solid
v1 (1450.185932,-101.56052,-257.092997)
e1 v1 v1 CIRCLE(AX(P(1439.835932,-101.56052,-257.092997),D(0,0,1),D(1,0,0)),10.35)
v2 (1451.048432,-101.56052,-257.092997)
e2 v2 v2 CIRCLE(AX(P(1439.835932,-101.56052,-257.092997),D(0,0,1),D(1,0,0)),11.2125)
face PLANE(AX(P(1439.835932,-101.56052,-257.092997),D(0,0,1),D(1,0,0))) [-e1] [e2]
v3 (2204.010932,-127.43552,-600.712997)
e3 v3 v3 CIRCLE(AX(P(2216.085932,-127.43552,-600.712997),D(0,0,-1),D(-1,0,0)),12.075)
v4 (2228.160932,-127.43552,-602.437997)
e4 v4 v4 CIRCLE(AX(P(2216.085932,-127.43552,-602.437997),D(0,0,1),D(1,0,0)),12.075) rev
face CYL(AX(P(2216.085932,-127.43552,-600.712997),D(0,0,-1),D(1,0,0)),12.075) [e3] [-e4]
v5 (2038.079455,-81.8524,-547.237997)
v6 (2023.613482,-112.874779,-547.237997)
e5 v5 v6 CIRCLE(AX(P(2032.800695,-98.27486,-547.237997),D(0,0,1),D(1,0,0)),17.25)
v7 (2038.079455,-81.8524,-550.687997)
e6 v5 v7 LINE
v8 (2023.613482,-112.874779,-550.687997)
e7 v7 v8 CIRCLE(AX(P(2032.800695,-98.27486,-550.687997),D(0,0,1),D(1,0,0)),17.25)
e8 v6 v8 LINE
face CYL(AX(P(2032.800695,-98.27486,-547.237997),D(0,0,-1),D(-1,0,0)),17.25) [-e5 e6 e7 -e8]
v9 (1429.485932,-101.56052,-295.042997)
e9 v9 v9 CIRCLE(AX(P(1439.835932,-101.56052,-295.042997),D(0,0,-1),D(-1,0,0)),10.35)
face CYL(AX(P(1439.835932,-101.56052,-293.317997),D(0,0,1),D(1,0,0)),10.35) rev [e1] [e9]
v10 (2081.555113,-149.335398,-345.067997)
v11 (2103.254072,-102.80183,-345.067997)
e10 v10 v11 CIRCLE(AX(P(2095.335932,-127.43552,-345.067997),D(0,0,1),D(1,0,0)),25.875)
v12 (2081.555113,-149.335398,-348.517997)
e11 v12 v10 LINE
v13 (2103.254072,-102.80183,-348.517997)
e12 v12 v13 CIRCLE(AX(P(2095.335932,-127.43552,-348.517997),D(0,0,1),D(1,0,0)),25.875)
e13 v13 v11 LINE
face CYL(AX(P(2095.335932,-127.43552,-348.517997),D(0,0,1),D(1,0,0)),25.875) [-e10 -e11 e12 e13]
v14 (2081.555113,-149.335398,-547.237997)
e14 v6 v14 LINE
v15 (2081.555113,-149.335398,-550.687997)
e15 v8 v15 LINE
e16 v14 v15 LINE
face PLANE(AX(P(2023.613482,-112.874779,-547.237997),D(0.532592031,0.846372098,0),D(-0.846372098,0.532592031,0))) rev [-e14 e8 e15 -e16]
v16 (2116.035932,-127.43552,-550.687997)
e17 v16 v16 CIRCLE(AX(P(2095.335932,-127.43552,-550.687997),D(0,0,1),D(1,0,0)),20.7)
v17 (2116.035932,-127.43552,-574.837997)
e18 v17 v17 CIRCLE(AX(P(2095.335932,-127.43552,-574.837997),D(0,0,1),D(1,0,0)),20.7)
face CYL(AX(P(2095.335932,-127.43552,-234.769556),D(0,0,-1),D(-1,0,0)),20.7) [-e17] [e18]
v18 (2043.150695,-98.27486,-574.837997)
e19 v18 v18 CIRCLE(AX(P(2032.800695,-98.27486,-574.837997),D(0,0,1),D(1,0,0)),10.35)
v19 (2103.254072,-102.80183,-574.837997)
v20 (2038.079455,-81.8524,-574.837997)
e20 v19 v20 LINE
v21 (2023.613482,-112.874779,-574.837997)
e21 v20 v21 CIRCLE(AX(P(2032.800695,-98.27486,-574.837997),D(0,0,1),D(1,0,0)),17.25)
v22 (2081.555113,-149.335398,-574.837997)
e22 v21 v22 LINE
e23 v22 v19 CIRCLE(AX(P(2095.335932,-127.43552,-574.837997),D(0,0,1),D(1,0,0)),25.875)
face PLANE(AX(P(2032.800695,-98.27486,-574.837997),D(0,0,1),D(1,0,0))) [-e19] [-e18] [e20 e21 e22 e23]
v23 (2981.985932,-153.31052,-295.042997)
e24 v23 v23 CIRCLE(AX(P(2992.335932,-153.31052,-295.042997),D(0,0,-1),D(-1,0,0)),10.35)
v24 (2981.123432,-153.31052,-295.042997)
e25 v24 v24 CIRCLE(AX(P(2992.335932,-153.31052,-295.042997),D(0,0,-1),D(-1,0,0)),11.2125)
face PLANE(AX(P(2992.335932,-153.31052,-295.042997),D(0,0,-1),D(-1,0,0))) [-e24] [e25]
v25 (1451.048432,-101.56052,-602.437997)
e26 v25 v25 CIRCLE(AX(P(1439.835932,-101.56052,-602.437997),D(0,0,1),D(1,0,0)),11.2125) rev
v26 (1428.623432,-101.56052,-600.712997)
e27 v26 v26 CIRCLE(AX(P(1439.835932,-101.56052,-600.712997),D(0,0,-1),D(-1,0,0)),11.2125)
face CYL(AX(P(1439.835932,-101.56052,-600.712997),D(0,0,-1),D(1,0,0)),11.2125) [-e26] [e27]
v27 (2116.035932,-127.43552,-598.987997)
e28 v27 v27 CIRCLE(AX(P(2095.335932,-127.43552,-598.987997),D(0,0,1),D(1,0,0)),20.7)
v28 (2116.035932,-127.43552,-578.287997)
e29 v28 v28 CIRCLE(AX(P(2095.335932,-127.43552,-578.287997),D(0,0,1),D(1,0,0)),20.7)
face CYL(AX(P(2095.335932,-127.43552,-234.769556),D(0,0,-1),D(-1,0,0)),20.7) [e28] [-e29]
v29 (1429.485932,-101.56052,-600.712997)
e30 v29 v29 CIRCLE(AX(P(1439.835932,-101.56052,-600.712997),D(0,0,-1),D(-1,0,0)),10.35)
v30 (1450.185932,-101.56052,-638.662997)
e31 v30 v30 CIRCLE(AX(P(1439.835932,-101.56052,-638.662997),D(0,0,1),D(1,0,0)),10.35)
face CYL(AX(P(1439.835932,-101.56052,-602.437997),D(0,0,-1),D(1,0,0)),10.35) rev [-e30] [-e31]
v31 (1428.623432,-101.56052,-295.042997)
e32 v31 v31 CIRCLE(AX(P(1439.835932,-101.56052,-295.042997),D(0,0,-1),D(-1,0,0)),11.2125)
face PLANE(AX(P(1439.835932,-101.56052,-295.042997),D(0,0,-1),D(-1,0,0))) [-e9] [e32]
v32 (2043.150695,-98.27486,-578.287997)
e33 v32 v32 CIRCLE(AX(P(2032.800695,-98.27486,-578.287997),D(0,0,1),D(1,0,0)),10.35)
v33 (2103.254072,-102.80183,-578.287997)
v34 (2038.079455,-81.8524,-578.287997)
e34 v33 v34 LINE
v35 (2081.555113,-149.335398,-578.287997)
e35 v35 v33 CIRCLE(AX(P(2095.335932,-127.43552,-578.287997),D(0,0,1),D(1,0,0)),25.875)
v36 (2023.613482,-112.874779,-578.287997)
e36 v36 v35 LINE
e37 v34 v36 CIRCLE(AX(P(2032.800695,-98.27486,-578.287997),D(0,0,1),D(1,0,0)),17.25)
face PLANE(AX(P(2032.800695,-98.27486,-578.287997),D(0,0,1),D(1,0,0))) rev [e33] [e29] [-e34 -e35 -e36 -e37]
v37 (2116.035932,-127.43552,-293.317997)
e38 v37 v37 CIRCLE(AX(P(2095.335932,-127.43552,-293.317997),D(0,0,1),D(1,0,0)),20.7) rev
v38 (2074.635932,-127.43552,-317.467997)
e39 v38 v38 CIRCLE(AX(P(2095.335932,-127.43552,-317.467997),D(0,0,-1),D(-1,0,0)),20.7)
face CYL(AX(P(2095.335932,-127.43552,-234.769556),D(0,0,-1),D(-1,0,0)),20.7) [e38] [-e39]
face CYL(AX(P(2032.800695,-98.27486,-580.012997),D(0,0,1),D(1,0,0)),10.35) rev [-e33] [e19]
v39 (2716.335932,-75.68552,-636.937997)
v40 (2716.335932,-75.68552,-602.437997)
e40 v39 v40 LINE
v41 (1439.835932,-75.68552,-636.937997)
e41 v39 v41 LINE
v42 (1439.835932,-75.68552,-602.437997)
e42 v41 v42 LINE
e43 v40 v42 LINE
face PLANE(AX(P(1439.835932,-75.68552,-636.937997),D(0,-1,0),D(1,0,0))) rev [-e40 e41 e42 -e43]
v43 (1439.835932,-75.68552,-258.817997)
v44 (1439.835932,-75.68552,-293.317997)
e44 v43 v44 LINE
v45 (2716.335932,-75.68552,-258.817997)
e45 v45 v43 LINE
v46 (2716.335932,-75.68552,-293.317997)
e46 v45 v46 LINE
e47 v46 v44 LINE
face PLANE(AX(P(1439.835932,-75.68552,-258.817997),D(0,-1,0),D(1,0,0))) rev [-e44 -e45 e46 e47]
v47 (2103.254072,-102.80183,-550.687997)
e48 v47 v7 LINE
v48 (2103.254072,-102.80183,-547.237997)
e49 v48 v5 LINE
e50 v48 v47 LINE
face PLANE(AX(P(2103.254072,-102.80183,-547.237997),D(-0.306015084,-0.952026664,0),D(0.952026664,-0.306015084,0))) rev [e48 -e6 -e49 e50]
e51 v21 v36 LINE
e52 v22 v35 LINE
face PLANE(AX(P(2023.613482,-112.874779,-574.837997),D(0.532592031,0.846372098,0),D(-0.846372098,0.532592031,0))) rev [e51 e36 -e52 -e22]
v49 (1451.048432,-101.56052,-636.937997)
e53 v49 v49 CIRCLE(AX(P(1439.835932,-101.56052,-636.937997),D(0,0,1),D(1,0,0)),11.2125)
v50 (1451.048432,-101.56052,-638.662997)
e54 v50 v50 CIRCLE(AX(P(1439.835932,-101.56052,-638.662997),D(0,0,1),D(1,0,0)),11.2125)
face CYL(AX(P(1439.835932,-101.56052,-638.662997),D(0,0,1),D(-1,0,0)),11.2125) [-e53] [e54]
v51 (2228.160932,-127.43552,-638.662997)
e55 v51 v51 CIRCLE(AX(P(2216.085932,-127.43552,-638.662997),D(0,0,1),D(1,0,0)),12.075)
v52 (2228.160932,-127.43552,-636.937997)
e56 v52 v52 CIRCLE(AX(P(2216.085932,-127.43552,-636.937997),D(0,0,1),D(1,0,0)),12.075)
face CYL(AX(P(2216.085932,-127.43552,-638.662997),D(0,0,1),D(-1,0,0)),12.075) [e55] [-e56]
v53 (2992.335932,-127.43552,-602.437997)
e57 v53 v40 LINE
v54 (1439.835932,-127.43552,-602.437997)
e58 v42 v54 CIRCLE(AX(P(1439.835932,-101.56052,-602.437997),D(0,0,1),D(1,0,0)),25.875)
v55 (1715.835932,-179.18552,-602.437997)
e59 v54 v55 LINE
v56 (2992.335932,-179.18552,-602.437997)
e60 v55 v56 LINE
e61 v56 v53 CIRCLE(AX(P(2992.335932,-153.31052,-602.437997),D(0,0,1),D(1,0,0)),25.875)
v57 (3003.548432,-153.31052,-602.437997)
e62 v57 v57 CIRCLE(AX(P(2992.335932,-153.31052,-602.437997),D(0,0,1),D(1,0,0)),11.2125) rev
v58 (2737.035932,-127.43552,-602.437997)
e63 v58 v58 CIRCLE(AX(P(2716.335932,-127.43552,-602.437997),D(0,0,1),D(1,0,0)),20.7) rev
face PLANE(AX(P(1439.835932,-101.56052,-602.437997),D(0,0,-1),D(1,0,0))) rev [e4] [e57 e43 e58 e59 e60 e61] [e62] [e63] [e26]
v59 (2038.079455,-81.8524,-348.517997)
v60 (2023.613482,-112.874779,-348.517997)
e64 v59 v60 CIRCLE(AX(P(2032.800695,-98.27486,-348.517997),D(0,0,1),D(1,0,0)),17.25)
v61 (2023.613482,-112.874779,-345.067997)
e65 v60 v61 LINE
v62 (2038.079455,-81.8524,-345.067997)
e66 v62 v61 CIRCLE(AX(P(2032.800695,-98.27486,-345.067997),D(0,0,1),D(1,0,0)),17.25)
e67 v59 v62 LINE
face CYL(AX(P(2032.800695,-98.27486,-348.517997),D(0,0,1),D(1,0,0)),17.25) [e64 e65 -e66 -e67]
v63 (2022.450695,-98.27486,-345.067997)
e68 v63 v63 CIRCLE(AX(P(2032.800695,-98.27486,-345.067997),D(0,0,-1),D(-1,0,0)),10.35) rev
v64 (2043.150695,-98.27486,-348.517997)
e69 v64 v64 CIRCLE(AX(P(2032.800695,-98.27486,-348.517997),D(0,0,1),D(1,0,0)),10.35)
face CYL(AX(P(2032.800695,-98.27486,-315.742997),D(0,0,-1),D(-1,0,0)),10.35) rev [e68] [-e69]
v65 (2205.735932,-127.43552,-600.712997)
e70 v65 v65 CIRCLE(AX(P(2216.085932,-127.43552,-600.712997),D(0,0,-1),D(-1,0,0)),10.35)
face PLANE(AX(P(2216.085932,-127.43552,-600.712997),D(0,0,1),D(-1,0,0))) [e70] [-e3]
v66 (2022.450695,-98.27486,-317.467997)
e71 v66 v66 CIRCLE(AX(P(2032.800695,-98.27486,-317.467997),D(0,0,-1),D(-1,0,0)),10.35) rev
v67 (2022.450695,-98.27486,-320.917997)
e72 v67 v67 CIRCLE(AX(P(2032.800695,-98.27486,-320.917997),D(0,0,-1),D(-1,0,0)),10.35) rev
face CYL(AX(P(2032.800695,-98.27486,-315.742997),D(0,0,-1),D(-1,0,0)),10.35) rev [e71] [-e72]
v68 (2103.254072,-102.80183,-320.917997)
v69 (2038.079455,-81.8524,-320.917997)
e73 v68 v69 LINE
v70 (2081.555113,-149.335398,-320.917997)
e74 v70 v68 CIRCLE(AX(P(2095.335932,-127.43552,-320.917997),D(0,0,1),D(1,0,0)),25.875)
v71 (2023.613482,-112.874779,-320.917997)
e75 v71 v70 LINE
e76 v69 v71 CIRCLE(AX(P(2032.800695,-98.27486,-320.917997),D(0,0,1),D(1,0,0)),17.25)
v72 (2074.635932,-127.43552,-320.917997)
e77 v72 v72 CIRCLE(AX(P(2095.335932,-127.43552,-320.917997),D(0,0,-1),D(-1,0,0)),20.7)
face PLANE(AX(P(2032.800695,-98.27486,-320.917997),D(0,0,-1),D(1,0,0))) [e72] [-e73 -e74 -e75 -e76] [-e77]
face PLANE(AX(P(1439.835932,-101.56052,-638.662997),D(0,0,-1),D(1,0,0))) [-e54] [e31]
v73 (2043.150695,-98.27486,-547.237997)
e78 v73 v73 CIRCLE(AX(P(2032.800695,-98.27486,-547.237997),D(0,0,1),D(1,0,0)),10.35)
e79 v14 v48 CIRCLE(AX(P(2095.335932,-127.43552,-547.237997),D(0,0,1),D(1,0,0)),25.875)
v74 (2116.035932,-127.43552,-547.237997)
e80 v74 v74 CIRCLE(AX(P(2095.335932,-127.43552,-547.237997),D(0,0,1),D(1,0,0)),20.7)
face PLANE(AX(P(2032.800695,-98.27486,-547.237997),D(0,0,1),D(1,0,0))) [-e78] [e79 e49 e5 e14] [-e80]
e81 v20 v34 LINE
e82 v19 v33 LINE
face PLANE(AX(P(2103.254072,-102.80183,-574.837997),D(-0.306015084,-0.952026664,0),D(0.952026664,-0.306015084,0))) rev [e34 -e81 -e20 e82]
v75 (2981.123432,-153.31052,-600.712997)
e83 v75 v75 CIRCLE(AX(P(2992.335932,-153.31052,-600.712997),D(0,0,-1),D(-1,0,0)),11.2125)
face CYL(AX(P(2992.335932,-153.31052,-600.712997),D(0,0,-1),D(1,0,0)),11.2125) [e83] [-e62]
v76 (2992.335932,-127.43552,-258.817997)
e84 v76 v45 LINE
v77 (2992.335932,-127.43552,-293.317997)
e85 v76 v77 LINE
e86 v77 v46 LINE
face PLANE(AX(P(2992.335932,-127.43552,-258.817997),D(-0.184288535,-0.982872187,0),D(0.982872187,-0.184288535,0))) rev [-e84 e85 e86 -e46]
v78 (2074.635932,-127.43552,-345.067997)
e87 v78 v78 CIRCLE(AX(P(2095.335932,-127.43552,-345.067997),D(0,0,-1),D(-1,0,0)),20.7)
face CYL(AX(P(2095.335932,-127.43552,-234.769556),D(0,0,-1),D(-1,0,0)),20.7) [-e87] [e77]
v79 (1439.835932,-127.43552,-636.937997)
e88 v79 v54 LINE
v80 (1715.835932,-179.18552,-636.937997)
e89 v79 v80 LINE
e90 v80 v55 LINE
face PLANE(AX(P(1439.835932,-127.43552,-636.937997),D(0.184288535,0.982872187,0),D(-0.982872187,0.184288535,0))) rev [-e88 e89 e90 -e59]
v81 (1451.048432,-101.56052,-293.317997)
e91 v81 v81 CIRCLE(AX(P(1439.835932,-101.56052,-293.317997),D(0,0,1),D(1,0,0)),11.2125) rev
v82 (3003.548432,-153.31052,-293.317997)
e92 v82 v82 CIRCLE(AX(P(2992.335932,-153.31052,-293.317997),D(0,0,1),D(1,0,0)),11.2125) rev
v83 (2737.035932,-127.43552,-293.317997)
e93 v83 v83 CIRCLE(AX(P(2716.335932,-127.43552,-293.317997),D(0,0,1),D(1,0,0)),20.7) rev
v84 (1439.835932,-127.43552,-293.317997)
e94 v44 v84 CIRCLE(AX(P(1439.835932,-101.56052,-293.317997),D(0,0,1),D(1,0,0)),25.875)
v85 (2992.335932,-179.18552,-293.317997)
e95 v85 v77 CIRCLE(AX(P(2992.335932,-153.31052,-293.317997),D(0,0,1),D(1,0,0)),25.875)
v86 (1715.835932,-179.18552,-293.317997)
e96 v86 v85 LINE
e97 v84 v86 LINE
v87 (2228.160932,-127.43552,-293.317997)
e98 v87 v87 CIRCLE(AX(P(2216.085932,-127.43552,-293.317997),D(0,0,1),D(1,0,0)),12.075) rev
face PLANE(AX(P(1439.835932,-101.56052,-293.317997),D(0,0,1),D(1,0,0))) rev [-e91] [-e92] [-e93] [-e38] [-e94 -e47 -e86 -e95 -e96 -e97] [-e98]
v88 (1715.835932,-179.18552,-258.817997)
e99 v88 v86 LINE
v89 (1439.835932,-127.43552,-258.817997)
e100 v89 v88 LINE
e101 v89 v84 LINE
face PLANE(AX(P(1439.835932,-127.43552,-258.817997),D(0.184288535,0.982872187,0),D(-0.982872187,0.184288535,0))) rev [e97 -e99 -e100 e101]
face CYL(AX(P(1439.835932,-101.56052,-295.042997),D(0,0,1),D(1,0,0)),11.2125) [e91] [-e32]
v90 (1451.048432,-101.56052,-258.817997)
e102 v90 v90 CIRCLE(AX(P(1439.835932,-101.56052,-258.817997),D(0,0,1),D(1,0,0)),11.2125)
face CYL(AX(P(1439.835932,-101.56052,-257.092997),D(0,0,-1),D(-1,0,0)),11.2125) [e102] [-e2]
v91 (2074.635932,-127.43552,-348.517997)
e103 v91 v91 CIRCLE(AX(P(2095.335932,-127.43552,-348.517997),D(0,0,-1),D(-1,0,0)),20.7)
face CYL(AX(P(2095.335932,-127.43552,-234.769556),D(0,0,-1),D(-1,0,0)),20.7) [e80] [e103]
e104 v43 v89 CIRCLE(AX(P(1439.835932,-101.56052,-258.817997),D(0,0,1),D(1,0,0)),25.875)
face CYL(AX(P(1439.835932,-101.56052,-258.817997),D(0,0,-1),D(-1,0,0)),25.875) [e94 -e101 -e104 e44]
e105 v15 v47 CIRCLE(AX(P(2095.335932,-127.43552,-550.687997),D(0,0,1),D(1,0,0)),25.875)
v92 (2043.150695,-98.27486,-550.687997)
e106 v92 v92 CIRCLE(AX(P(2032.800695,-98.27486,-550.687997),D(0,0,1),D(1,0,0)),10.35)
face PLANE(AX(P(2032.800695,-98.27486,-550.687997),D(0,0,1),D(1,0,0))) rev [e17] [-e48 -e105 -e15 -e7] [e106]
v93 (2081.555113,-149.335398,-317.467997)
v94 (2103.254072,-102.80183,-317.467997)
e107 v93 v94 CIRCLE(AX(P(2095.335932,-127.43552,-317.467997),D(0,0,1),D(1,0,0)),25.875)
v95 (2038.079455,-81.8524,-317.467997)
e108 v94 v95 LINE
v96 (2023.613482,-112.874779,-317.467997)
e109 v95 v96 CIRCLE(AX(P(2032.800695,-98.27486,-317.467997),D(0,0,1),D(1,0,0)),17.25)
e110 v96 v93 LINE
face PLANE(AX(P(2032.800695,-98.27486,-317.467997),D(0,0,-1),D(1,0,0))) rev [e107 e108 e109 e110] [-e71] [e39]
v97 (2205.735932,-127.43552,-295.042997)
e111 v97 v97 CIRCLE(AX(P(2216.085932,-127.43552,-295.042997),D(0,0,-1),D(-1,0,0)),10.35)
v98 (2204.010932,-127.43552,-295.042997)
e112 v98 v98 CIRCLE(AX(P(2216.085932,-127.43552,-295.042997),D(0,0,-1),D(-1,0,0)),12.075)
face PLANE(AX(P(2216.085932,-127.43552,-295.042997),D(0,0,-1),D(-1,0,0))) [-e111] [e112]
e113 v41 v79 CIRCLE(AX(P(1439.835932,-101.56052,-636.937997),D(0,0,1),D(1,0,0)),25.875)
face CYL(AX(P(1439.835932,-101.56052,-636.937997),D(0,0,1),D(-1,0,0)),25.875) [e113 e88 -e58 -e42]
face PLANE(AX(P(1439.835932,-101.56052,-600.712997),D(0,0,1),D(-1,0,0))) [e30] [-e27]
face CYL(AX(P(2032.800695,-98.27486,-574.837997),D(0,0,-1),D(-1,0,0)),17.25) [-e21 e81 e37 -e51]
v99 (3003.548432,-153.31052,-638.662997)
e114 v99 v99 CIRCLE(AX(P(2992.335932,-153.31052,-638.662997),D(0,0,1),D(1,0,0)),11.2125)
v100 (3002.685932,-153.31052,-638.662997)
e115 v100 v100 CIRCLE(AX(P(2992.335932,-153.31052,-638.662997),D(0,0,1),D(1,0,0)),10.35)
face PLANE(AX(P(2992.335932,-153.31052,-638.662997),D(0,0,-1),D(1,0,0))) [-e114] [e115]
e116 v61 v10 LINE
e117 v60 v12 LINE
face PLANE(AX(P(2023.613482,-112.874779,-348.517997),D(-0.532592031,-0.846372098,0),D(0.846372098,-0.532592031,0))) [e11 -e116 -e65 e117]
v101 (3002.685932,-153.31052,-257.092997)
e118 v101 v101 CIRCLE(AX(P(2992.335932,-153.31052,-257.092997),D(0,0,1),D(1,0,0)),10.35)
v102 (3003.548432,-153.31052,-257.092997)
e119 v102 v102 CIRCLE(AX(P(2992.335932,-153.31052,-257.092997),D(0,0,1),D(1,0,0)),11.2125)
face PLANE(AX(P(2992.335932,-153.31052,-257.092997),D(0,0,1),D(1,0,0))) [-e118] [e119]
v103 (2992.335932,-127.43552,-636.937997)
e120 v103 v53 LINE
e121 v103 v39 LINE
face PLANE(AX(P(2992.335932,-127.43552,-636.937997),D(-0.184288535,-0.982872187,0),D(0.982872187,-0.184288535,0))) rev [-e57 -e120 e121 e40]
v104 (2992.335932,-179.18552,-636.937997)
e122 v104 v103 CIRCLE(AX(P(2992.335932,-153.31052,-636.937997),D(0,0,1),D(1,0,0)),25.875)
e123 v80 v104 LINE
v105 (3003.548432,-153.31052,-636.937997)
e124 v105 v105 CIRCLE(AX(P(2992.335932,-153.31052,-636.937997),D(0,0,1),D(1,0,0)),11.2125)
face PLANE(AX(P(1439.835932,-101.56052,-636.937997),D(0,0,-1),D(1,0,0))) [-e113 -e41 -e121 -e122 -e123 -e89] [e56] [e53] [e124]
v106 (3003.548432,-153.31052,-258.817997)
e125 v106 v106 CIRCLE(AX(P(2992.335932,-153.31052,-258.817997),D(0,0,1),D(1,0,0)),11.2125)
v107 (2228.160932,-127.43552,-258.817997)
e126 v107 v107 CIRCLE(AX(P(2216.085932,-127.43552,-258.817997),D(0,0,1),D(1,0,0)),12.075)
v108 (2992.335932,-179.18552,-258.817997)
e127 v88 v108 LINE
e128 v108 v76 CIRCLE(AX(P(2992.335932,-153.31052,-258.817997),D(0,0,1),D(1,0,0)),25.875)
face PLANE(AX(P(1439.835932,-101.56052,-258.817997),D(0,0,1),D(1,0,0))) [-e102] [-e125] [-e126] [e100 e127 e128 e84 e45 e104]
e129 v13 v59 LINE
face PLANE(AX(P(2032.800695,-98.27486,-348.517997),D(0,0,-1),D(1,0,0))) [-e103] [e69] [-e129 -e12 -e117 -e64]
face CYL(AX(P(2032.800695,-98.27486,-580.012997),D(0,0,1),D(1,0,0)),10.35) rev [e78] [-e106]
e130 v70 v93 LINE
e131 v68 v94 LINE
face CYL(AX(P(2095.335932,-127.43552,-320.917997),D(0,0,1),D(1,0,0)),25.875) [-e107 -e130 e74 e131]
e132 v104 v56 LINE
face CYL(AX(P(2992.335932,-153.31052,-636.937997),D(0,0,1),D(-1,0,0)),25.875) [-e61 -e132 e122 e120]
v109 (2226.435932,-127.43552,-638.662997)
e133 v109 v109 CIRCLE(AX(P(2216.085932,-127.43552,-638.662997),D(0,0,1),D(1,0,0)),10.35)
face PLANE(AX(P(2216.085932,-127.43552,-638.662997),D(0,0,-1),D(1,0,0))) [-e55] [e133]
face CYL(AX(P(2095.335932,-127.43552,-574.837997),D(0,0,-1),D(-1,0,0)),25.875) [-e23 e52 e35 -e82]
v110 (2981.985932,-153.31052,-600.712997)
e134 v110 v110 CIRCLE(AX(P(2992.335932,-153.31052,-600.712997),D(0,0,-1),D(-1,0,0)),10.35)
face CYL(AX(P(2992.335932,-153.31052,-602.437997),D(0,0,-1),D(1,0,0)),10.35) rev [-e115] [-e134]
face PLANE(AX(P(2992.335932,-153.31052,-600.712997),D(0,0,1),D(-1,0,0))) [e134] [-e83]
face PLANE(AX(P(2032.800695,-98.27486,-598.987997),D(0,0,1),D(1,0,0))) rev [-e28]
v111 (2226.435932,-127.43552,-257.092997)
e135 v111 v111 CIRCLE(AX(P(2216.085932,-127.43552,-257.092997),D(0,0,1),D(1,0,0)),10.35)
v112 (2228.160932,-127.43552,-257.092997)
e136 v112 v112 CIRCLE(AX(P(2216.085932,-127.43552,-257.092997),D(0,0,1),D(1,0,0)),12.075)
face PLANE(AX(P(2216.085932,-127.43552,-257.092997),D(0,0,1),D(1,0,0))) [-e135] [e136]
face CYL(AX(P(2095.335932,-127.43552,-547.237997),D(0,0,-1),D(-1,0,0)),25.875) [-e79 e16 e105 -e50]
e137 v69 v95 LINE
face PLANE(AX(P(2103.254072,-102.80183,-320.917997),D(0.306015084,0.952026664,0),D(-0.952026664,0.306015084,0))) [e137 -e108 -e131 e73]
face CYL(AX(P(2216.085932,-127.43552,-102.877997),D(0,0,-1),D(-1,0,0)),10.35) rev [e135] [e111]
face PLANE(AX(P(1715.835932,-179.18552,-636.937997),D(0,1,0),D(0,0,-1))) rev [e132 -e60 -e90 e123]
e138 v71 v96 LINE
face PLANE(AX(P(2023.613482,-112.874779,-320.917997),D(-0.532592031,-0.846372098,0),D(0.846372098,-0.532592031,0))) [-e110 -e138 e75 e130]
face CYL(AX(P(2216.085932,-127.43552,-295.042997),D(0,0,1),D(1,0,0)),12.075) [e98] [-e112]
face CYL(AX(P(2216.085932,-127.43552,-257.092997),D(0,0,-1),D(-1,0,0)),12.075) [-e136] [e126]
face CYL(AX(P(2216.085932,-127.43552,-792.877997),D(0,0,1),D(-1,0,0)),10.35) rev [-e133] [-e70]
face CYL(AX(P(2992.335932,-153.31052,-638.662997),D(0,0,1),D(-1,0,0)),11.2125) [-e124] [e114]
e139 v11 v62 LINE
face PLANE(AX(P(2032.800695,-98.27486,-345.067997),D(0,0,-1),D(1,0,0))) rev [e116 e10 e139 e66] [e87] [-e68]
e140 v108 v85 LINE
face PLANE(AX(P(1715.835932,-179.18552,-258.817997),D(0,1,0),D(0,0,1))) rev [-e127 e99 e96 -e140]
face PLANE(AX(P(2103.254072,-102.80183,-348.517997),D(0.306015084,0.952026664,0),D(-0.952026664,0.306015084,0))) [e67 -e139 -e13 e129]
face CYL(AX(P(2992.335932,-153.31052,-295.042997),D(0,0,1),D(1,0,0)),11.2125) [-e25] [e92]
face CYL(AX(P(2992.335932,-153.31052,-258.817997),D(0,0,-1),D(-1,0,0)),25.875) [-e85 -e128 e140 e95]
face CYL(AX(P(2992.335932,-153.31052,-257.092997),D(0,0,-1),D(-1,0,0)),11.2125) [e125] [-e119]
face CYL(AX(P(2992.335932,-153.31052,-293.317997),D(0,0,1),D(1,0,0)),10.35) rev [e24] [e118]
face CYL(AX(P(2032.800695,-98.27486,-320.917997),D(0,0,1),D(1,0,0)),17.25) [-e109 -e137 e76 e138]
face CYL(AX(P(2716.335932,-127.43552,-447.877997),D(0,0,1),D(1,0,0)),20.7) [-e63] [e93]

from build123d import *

# Parameters (mm, degrees)
EXTRUDE_1_DEPTH        = 100
SKETCH_2_R             = 30
CUT_EXTRUDE_1_DEPTH    = 100
SKETCH_3_R             = 32.5
SKETCH_3_R_2           = 30
EXTRUDE_2_DEPTH        = 5
EXTRUDE_START          = 5
SKETCH_4_R             = 32.5
SKETCH_4_R_2           = 30
EXTRUDE_3_DEPTH        = 5
SKETCH_5_R             = 30
CUT_EXTRUDE_3_DEPTH    = 552
SKETCH_6_R             = 35
SKETCH_6_R_2           = 30
EXTRUDE_4_DEPTH        = 5
SKETCH_7_R             = 35
SKETCH_7_R_2           = 30
EXTRUDE_5_DEPTH        = 5
SKETCH_8_R             = 60
EXTRUDE_6_DEPTH        = 448
SKETCH_9_R             = 60
EXTRUDE_7_DEPTH        = 896
EXTRUDE_8_DEPTH        = 10
EXTRUDE_10_DEPTH       = 10
CUT_EXTRUDE_START      = -10
CUT_EXTRUDE_6_DEPTH    = 10
PATTERN_LINEAR_2_COUNT = 2
PATTERN_LINEAR_2_PITCH = 80
SKETCH_16_R            = 30
CUT_EXTRUDE_7_DEPTH    = 95
MIRROR_START           = -160
MIRROR_3_OUTLINE_R     = 30
MIRROR_3_DEPTH         = 10
MIRROR_START_2         = -80
MIRROR_3_2_OUTLINE_R   = 30
MIRROR_3_2_DEPTH       = 10
SCALE1_SCALE           = 0.345


# Read off the part's stored shape, not the designer's step: 镜向3
with BuildPart() as part:
    # 草图1 → 凸台-拉伸1 (new body)
    with BuildSketch(Plane.XY):
        with BuildLine():
            Line((-60.1323511, -127.533248731), (739.8676489, -277.533248731))
            Line((739.8676489, -277.533248731), (4439.8676489, -277.533248731))
            ThreePointArc((4439.8676489, -277.533248731), (4514.8676489, -202.533248731), (4439.8676489, -127.533248731))
            Line((4439.8676489, -127.533248731), (3639.8676489, 22.466751269))
            Line((3639.8676489, 22.466751269), (-60.1323511, 22.466751269))
            ThreePointArc((-60.1323511, 22.466751269), (-135.1323511, -52.533248731), (-60.1323511, -127.533248731))
        make_face()
    extrude(amount=EXTRUDE_1_DEPTH)

    # 草图2 → 切除-拉伸1 (cut)
    with BuildSketch(Plane.XY.offset(100)):
        with Locations((-60.1323511, -52.533248731)):
            Circle(SKETCH_2_R)
        with Locations((4439.8676489, -202.533248731)):
            Circle(SKETCH_2_R)
    extrude(amount=-CUT_EXTRUDE_1_DEPTH, mode=Mode.SUBTRACT)

    # 草图3 → 凸台-拉伸2 (add)
    # profile 1 of 2: a face of its own
    with BuildSketch(Plane(origin=(0, 0, 0), x_dir=(-1, 0, 0), z_dir=(0, 0, -1))):
        with Locations(Location((-4439.8676489, -202.533248731, 0), (0, 0, 180))):
            Circle(SKETCH_3_R)
        with Locations(Location((-4439.8676489, -202.533248731, 0), (0, 0, 180))):
            Circle(SKETCH_3_R_2, mode=Mode.SUBTRACT)
    # profile 2 of 2: a face of its own
    with BuildSketch(Plane(origin=(0, 0, 0), x_dir=(-1, 0, 0), z_dir=(0, 0, -1))):
        with Locations(Location((60.1323511, -52.533248731, 0), (0, 0, 180))):
            Circle(SKETCH_3_R)
        with Locations(Location((60.1323511, -52.533248731, 0), (0, 0, 180))):
            Circle(SKETCH_3_R_2, mode=Mode.SUBTRACT)
    extrude(amount=EXTRUDE_2_DEPTH)

    # 草图4 → 凸台-拉伸3 (add)
    # profile 1 of 2: a face of its own
    with BuildSketch(Plane.XY.offset(100).offset(EXTRUDE_START)):
        with Locations((-60.1323511, -52.533248731)):
            Circle(SKETCH_4_R)
        with Locations((-60.1323511, -52.533248731)):
            Circle(SKETCH_4_R_2, mode=Mode.SUBTRACT)
    # profile 2 of 2: a face of its own
    with BuildSketch(Plane.XY.offset(100).offset(EXTRUDE_START)):
        with Locations((4439.8676489, -202.533248731)):
            Circle(SKETCH_4_R)
        with Locations((4439.8676489, -202.533248731)):
            Circle(SKETCH_4_R_2, mode=Mode.SUBTRACT)
    extrude(amount=-EXTRUDE_3_DEPTH)

    # 草图5 → 切除-拉伸3 (cut)
    with BuildSketch(Plane(origin=(0, 0, 0), x_dir=(-1, 0, 0), z_dir=(0, 0, -1))):
        with Locations((-2189.8676489, -127.533248731)):
            Circle(SKETCH_5_R)
    extrude(amount=-CUT_EXTRUDE_3_DEPTH, mode=Mode.SUBTRACT)

    # 草图6 → 凸台-拉伸4 (add)
    with BuildSketch(Plane.XY.offset(100)):
        with Locations((2189.8676489, -127.533248731)):
            Circle(SKETCH_6_R)
        with Locations(Location((2189.8676489, -127.533248731, 0), (0, 0, 180))):
            Circle(SKETCH_6_R_2, mode=Mode.SUBTRACT)
    extrude(amount=EXTRUDE_4_DEPTH)

    # 草图7 → 凸台-拉伸5 (add)
    with BuildSketch(Plane(origin=(0, 0, 0), x_dir=(-1, 0, 0), z_dir=(0, 0, -1)).offset(EXTRUDE_START)):
        with Locations(Location((-2189.8676489, -127.533248731, 0), (0, 0, 180))):
            Circle(SKETCH_7_R)
        with Locations((-2189.8676489, -127.533248731)):
            Circle(SKETCH_7_R_2, mode=Mode.SUBTRACT)
    extrude(amount=-EXTRUDE_5_DEPTH)

    # 草图8 → 凸台-拉伸6 (add)
    with BuildSketch(Plane(origin=(0, 0, 0), x_dir=(-1, 0, 0), z_dir=(0, 0, -1))):
        with Locations(Location((-3639.8676489, -127.533248731, 0), (0, 0, 180))):
            Circle(SKETCH_8_R)
    extrude(amount=EXTRUDE_6_DEPTH)

    # 镜向1: part across plane


with BuildPart() as part_1:
    add(part.part)
    add(part.part.mirror(Plane(origin=(3639.8676489, -127.533248731, -448), x_dir=(1, 0, 0), z_dir=(0, 0, -1))))

    # 草图9 → 凸台-拉伸7 (add)
    with BuildSketch(Plane.XY.offset(-896)):
        with Locations(Location((1839.8676489, -127.533248731, 0), (0, 0, 180))):
            Circle(SKETCH_9_R)
    extrude(amount=EXTRUDE_7_DEPTH)

    # 草图10 → 凸台-拉伸8 (add)
    with BuildSketch(Plane.XY.offset(-896)):
        with BuildLine():
            Line((1631.976489947, -85.328201293), (1799.923246582, -191.011156096))
            ThreePointArc((1799.923246582, -191.011156096), (1907.840732928, -159.229618362), (1862.818780211, -56.131248958))
            Line((1862.818780211, -56.131248958), (1673.9068457, 4.591736799))
            ThreePointArc((1673.9068457, 4.591736799), (1613.290702141, -21.878683296), (1631.976489947, -85.328201293))
        make_face()
    extrude(amount=EXTRUDE_8_DEPTH)

    # 草图14 → 凸台-拉伸10 (add)
    with BuildSketch(Plane.XY.offset(-826)):
        with BuildLine():
            Line((1631.976489947, -85.328201293), (1799.923246582, -191.011156096))
            ThreePointArc((1799.923246582, -191.011156096), (1907.840732928, -159.229618362), (1862.818780211, -56.131248958))
            Line((1862.818780211, -56.131248958), (1673.9068457, 4.591736799))
            ThreePointArc((1673.9068457, 4.591736799), (1613.290702141, -21.878683296), (1631.976489947, -85.328201293))
        make_face()
    extrude_10 = extrude(amount=EXTRUDE_10_DEPTH)

    # 草图15 → 切除-拉伸6 (cut)
    with BuildSketch(Plane.XY.offset(-886).offset(CUT_EXTRUDE_START)):
        with BuildLine():
            Line((1631.976489947, -85.328201293), (1799.923246582, -191.011156096))
            ThreePointArc((1799.923246582, -191.011156096), (1907.840732928, -159.229618362), (1862.818780211, -56.131248958))
            Line((1862.818780211, -56.131248958), (1673.9068457, 4.591736799))
            ThreePointArc((1673.9068457, 4.591736799), (1613.290702141, -21.878683296), (1631.976489947, -85.328201293))
        make_face()
    extrude(amount=CUT_EXTRUDE_6_DEPTH, mode=Mode.SUBTRACT)

    # 阵列(线性)2: 凸台-拉伸10 ×2
    with Locations(*[(0, 0, i * PATTERN_LINEAR_2_PITCH) for i in range(1, PATTERN_LINEAR_2_COUNT)]):
        add(extrude_10)

    # 草图16 → 切除-拉伸7 (cut)
    with BuildSketch(Plane.XY.offset(-736)):
        with Locations((1658.606091493, -43.009596383)):
            Circle(SKETCH_16_R)
    extrude(amount=-CUT_EXTRUDE_7_DEPTH, mode=Mode.SUBTRACT)

    # 镜向3 outline → 镜向3 (add)
    with BuildSketch(Plane.XY.offset(MIRROR_START)):
        with BuildLine():
            Line((1862.818780211, -56.131248958), (1673.9068457, 4.591736799))
            ThreePointArc((1673.9068457, 4.591736799), (1613.290702141, -21.878683296), (1631.976489947, -85.328201293))
            Line((1631.976489947, -85.328201293), (1799.923246582, -191.011156096))
            ThreePointArc((1799.923246582, -191.011156096), (1907.840732928, -159.229618361), (1862.818780211, -56.131248958))
        make_face()
        with Locations((1658.606091493, -43.009596383)):
            Circle(MIRROR_3_OUTLINE_R, mode=Mode.SUBTRACT)
    extrude(amount=MIRROR_3_DEPTH)

    # Mirror 3 2 outline → Mirror 3 2 (add)
    with BuildSketch(Plane.XY.offset(MIRROR_START_2)):
        with BuildLine():
            Line((1862.818780211, -56.131248958), (1673.9068457, 4.591736799))
            ThreePointArc((1673.9068457, 4.591736799), (1613.290702141, -21.878683296), (1631.976489947, -85.328201293))
            Line((1631.976489947, -85.328201293), (1799.923246582, -191.011156096))
            ThreePointArc((1799.923246582, -191.011156096), (1907.840732928, -159.229618361), (1862.818780211, -56.131248958))
        make_face()
        with Locations((1658.606091493, -43.009596383)):
            Circle(MIRROR_3_2_OUTLINE_R, mode=Mode.SUBTRACT)
    extrude(amount=MIRROR_3_2_DEPTH)


with BuildPart() as part_2:
    # Scale1: scaled about (2229.895561812, -127.384045127, -447.813736157)
    add(part_1.part.scale(SCALE1_SCALE).moved(Location((1460.581592987, -83.436549558, -293.317997183))))


solid = part_2.part
